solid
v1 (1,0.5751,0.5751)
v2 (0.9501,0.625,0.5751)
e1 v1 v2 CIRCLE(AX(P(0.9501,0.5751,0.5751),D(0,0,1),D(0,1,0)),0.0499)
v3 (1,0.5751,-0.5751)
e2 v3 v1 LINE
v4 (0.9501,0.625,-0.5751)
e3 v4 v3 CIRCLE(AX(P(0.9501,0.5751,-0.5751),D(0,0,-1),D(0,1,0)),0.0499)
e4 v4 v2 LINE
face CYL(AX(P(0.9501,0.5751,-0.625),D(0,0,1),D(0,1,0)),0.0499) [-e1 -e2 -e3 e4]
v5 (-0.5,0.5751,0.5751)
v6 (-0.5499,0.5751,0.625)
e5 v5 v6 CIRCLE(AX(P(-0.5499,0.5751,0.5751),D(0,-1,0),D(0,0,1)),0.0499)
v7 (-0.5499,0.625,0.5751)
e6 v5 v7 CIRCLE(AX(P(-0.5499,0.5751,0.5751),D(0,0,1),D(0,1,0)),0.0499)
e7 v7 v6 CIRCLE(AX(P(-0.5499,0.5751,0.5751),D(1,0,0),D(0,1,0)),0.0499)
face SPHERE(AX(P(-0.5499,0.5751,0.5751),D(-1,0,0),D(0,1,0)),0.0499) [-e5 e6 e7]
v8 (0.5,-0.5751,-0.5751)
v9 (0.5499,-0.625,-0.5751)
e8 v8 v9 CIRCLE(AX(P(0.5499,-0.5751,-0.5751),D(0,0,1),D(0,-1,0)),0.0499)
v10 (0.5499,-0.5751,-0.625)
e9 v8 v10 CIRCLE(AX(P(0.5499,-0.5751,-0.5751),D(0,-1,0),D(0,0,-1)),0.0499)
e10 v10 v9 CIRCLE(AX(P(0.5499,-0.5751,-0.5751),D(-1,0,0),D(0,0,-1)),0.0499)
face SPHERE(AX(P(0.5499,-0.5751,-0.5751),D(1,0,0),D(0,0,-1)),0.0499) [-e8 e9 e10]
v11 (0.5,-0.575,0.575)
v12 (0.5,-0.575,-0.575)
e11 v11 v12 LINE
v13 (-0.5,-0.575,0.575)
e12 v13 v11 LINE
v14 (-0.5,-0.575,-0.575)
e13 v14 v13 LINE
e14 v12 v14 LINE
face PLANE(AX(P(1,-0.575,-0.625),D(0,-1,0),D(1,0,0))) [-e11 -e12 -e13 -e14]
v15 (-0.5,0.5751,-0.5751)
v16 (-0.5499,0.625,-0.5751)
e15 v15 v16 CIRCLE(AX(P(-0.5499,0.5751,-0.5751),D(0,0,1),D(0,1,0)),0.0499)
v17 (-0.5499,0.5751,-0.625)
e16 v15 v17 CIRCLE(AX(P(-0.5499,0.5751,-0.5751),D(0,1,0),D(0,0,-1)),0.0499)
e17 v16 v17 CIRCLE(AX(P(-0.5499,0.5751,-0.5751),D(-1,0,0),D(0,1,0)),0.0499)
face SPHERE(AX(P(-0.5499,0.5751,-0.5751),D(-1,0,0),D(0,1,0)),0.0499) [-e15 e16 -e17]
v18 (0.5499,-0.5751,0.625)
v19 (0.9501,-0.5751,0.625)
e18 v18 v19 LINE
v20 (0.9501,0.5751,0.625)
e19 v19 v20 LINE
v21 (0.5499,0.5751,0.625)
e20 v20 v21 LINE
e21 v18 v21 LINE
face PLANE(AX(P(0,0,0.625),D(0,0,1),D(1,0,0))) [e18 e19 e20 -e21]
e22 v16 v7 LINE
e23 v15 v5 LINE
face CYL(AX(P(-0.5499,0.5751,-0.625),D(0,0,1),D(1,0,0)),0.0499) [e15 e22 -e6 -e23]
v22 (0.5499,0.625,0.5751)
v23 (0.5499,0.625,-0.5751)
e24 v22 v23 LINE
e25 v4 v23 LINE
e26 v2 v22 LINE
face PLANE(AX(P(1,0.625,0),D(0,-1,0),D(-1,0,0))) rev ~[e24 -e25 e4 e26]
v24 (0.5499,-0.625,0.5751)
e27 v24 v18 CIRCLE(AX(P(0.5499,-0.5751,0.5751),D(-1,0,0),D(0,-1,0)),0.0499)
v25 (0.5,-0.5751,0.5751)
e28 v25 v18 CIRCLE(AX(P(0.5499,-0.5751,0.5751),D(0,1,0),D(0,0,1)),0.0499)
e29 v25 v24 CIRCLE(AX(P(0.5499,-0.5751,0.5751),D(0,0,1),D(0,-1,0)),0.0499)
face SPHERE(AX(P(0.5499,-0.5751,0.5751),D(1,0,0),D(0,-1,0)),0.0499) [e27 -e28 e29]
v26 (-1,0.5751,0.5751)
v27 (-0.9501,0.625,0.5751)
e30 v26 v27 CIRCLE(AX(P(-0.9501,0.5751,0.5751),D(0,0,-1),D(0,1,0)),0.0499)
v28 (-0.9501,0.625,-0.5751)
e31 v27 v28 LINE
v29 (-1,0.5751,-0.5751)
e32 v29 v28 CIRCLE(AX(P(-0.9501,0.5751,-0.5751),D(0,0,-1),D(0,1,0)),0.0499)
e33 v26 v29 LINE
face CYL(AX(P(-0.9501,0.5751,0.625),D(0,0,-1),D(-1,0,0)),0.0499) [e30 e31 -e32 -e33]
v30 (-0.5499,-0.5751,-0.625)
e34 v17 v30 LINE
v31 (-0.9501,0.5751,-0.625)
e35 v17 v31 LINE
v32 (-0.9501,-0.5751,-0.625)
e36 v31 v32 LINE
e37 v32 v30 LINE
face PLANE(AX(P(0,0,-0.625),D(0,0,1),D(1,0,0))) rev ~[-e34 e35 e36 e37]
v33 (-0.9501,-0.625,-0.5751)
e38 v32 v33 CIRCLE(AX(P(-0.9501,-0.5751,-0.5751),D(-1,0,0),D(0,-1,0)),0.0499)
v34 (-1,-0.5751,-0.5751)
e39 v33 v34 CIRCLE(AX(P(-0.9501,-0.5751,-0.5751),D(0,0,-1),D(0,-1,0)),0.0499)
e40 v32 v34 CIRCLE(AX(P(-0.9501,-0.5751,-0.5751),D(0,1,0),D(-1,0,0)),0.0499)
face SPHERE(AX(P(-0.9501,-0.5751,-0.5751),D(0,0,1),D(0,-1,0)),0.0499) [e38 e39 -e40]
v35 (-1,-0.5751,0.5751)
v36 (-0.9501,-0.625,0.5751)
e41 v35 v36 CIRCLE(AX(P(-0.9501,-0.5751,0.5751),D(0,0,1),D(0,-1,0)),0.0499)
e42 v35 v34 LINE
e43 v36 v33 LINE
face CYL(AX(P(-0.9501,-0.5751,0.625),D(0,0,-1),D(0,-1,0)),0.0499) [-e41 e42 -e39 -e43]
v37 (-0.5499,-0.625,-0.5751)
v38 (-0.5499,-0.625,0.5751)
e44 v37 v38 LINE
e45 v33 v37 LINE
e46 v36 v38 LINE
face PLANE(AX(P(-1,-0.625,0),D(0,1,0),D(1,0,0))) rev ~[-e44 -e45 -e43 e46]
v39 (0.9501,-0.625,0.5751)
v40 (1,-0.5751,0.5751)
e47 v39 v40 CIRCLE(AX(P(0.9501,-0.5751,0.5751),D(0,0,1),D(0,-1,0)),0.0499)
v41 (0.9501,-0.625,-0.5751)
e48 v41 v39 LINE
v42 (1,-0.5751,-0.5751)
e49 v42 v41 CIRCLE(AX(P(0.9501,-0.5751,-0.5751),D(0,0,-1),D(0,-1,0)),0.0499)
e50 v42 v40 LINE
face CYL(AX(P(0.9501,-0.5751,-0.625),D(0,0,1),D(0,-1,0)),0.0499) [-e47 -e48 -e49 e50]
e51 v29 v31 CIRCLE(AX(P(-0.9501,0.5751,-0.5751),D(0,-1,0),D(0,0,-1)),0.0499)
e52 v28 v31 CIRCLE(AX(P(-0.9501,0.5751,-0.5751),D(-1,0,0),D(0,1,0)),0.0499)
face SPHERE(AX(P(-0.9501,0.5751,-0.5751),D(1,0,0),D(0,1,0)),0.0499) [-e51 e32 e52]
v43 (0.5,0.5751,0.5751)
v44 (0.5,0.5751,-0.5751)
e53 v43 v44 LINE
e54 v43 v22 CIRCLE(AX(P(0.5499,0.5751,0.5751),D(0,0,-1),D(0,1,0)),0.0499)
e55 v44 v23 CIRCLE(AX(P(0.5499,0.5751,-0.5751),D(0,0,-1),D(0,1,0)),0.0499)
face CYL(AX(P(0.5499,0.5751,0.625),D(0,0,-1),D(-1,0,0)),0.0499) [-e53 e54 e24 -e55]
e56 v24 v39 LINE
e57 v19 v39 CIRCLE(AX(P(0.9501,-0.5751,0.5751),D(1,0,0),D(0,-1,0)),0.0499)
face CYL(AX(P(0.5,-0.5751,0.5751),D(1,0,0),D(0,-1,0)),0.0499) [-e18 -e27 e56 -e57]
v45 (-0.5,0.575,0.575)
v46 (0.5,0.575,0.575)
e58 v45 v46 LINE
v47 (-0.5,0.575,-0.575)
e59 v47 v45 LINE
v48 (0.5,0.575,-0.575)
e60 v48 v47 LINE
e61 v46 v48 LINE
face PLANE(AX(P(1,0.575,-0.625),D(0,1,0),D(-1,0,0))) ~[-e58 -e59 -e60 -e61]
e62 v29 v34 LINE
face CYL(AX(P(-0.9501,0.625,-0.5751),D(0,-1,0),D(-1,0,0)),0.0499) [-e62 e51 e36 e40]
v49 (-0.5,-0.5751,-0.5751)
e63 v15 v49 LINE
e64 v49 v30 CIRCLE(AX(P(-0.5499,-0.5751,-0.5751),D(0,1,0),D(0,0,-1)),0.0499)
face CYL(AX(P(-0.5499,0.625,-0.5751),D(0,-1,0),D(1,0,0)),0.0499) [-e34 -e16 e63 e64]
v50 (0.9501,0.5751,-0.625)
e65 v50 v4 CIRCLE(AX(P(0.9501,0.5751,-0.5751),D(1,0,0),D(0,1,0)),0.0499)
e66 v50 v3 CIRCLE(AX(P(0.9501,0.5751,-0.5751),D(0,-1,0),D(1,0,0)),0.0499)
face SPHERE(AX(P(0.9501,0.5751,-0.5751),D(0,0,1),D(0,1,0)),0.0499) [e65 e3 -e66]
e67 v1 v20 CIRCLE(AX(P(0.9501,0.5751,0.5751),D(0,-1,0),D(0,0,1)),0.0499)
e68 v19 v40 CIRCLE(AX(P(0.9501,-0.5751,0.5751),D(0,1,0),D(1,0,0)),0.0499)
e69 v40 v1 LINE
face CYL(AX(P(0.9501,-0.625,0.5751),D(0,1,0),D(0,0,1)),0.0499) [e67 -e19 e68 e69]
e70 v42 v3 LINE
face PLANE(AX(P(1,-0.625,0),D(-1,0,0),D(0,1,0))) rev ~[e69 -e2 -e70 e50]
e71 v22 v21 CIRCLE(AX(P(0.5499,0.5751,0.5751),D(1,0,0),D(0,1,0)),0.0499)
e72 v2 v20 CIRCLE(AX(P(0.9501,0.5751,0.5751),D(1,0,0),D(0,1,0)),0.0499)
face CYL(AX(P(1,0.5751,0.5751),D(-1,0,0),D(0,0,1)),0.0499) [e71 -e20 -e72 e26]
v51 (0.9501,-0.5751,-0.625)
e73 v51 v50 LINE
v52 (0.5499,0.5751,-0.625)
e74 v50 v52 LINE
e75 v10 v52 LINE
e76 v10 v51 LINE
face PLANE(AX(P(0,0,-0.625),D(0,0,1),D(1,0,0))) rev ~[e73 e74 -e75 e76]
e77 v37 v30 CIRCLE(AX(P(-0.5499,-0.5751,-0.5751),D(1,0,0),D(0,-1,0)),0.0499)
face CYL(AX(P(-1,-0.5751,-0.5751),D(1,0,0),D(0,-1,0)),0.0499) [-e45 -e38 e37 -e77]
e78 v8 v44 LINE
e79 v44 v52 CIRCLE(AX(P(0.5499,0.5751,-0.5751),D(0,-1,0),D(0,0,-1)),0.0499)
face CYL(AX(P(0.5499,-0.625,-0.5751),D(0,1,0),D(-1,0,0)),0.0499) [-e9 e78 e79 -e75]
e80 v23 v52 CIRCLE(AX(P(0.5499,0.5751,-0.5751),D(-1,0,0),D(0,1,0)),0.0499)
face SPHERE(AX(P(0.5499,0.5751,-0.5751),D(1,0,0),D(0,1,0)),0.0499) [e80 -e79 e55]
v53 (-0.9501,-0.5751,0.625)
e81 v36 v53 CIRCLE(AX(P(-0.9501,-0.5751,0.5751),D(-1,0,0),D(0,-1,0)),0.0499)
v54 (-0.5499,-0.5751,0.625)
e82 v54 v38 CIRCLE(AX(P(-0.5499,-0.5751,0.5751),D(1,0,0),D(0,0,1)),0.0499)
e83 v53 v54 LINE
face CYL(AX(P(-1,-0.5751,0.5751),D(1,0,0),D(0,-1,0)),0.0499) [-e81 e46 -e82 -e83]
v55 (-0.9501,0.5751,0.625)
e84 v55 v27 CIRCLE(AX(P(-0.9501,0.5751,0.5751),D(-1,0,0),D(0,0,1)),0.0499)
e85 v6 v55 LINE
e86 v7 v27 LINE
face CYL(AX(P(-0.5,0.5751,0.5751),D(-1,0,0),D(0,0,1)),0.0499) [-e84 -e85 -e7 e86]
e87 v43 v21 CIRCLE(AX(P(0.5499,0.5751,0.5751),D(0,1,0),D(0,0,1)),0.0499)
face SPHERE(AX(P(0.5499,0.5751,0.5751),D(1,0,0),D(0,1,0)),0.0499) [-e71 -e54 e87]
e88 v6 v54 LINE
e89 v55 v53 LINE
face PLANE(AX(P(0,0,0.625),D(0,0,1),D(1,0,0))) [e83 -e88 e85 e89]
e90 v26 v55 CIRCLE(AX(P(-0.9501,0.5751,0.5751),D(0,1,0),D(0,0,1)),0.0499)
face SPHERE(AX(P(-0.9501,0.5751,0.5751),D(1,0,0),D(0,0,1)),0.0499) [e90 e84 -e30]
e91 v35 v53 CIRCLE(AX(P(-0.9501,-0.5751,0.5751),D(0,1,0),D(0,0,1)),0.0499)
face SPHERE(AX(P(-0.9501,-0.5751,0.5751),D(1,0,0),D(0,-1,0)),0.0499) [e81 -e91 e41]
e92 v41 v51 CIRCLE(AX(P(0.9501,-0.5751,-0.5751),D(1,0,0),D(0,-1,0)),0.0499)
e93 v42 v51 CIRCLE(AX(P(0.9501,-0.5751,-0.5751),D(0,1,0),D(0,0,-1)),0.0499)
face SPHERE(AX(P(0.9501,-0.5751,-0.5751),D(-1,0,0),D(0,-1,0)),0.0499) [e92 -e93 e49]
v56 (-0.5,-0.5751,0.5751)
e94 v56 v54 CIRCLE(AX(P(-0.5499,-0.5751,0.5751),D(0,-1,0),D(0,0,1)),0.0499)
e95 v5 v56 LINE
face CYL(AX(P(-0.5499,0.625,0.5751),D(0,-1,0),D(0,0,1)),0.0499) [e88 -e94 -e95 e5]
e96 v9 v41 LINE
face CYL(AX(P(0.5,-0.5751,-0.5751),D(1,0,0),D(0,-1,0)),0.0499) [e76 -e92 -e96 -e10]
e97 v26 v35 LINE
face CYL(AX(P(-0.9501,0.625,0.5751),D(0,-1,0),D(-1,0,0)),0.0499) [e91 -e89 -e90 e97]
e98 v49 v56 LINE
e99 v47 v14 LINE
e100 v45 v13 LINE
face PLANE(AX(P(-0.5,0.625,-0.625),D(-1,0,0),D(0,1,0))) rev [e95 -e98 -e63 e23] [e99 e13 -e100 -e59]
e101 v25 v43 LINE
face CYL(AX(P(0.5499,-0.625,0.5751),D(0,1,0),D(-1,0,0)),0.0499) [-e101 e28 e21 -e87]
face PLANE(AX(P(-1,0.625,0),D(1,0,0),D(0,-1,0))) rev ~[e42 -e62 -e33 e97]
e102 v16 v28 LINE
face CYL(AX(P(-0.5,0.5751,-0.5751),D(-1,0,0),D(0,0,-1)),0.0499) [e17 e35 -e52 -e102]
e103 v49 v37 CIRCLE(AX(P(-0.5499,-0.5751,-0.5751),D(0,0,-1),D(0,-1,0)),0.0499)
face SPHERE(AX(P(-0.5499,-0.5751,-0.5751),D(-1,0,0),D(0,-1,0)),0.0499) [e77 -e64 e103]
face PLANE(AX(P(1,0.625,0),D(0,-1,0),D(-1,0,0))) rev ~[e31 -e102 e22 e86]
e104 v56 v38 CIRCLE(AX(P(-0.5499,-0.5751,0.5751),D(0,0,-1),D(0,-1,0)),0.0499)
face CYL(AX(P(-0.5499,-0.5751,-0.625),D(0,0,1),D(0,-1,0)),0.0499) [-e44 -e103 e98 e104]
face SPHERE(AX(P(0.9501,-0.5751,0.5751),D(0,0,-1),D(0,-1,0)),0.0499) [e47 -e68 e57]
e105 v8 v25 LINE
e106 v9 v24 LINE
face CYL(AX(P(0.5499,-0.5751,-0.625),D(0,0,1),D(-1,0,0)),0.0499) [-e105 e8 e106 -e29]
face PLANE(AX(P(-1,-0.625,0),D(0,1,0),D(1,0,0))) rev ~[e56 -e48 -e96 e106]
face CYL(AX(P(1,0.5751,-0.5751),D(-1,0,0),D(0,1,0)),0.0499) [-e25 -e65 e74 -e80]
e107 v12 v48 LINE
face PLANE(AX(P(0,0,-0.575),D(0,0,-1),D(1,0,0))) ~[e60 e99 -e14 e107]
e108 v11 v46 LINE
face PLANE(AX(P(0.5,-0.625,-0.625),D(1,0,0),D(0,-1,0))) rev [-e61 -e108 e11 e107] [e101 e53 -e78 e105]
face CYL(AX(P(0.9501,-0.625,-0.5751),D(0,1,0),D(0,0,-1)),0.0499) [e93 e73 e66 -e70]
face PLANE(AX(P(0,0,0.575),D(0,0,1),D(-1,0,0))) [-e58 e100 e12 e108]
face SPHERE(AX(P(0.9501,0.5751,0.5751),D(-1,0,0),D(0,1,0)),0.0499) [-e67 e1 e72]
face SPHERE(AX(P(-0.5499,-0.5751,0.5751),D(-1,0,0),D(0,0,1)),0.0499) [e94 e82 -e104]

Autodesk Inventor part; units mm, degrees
ref_plane "YZ Plane" through (0, 0, 0) normal (1, 0, 0) x (0, 1, 0)
ref_plane "XZ Plane" through (0, 0, 0) normal (0, 1, 0) x (-1, 0, 0)
ref_plane "XY Plane" through (0, 0, 0) normal (0, 0, 1) x (1, 0, 0)
sketch "Sketch1" plane through (0, 0, 0) normal (0, 0, 1) x (1, 0, 0)
  line L0 (1, 0.625) -> (-1, 0.625)
  line L1 (-1, 0.625) -> (-1, -0.625)
  line L2 (-1, -0.625) -> (1, -0.625)
  line L3 (1, -0.625) -> (1, 0.625)
  line L4 (1, 0.625) -> (-1, -0.625) construction
  line L5 (-1, 0.625) -> (1, -0.625) construction
  point P0 (0, 0)
  point P1 (0, 0)
  point P2 (0, 0)
  dimension "d0" = 2
  dimension "d1" = 1.25
sketch "Sketch1 outline for Extrusion1" plane through (0, 0, 0) normal (0, 0, 1) x (1, 0, 0)
  line L0 (1, -0.625) -> (1, 0.625)
  line L1 (-1, -0.625) -> (1, -0.625)
  line L2 (-1, 0.625) -> (-1, -0.625)
  line L3 (1, 0.625) -> (-1, 0.625)
extrude "Extrusion1" add sketch "Sketch1 outline for Extrusion1" along normal mid plane 1.25
sketch "Sketch2" plane through (0, 0, 0.625) normal (0, 0, 1) x (-1, 0, 0)
  line L0 (0.5, 0.624281) -> (0.5, -0.625)
  line L1 (-0.5, 0.625) -> (-0.5, -0.625)
  line L2 (-0.5, 0.625) -> (0.5, 0.625)
  line L3 (0.5, 0.625) -> (0.5, -0.625)
  line L4 (0.5, -0.625) -> (-0.5, -0.625)
  line L5 (-0.5, -0.625) -> (-0.5, 0.625)
  line L6 (-1, -0.625) -> (1, -0.625)
  line L7 (1, 0.625) -> (-1, 0.625)
  line L8 (1, -0.625) -> (1, 0.625)
  line L9 (-1, 0.625) -> (-1, -0.625)
  point P0 (0, 0)
  dimension "d11" = 0.5
  dimension "d12" = 0.5
sketch "Sketch2 outline for Extrusion2" plane through (0, 0, 0.625) normal (0, 0, 1) x (-1, 0, 0)
  line L0 (-0.5, -0.625) -> (0.5, -0.625)
  line L1 (-0.5, 0.625) -> (-0.5, -0.625)
  line L2 (0.5, 0.625) -> (-0.5, 0.625)
  line L3 (0.5, -0.625) -> (0.5, 0.625)
extrude "Extrusion2" cut sketch "Sketch2 outline for Extrusion2" against normal blind 0.05
mirror "Mirror1" about plane through (0, 0, 0) normal (0, 0, 1) of "Extrusion2"
sketch "Sketch3" plane through (1, -0.625, -0.625) normal (0, -1, 0) x (1, 0, 0)
  line L0 (-1.5, 1.2) -> (-0.5, 1.2)
  line L1 (-0.5, 1.2) -> (-0.5, 0.05)
  line L2 (-0.5, 0.05) -> (-1.5, 0.05)
  line L3 (-1.5, 0.05) -> (-1.5, 1.2)
  point P0 (-1, 0.625)
sketch "Sketch3 outline for Extrusion3" plane through (1, -0.625, -0.625) normal (0, -1, 0) x (1, 0, 0)
  line L0 (-1.5, 1.2) -> (-0.5, 1.2)
  line L1 (-0.5, 1.2) -> (-0.5, 0.05)
  line L2 (-0.5, 0.05) -> (-1.5, 0.05)
  line L3 (-1.5, 0.05) -> (-1.5, 1.2)
extrude "Extrusion3" cut sketch "Sketch3 outline for Extrusion3" against normal blind 0.05
mirror "Mirror2" about plane through (0, 0, 0) normal (0, 1, 0) of "Extrusion3"
fillet "Fillet1" radius 0.05 24 edges at (0.75, 0.625, 0.625) (1, 0.625, 0) (0.75, 0.625, -0.625) (0.75, -0.625, -0.625) (1, -0.625, 0) (0.75, -0.625, 0.625) (-0.75, -0.625, 0.625) (-1, -0.625, 0) (-0.75, -0.625, -0.625) (1, 0, -0.625) (1, 0, 0.625) (-0.75, 0.625, 0.625) (-1, 0, 0.625) (-0.75, 0.625, -0.625) (-1, 0.625, 0) (-1, 0, -0.625) (-0.5, 0.625, 0) (-0.5, 0, 0.625) (-0.5, -0.625, 0) (-0.5, 0, -0.625) (0.5, 0.625, 0) (0.5, 0, -0.625) (0.5, -0.625, 0) (0.5, 0, 0.625)
properties part number "CL21F106ZPFNNNE"
